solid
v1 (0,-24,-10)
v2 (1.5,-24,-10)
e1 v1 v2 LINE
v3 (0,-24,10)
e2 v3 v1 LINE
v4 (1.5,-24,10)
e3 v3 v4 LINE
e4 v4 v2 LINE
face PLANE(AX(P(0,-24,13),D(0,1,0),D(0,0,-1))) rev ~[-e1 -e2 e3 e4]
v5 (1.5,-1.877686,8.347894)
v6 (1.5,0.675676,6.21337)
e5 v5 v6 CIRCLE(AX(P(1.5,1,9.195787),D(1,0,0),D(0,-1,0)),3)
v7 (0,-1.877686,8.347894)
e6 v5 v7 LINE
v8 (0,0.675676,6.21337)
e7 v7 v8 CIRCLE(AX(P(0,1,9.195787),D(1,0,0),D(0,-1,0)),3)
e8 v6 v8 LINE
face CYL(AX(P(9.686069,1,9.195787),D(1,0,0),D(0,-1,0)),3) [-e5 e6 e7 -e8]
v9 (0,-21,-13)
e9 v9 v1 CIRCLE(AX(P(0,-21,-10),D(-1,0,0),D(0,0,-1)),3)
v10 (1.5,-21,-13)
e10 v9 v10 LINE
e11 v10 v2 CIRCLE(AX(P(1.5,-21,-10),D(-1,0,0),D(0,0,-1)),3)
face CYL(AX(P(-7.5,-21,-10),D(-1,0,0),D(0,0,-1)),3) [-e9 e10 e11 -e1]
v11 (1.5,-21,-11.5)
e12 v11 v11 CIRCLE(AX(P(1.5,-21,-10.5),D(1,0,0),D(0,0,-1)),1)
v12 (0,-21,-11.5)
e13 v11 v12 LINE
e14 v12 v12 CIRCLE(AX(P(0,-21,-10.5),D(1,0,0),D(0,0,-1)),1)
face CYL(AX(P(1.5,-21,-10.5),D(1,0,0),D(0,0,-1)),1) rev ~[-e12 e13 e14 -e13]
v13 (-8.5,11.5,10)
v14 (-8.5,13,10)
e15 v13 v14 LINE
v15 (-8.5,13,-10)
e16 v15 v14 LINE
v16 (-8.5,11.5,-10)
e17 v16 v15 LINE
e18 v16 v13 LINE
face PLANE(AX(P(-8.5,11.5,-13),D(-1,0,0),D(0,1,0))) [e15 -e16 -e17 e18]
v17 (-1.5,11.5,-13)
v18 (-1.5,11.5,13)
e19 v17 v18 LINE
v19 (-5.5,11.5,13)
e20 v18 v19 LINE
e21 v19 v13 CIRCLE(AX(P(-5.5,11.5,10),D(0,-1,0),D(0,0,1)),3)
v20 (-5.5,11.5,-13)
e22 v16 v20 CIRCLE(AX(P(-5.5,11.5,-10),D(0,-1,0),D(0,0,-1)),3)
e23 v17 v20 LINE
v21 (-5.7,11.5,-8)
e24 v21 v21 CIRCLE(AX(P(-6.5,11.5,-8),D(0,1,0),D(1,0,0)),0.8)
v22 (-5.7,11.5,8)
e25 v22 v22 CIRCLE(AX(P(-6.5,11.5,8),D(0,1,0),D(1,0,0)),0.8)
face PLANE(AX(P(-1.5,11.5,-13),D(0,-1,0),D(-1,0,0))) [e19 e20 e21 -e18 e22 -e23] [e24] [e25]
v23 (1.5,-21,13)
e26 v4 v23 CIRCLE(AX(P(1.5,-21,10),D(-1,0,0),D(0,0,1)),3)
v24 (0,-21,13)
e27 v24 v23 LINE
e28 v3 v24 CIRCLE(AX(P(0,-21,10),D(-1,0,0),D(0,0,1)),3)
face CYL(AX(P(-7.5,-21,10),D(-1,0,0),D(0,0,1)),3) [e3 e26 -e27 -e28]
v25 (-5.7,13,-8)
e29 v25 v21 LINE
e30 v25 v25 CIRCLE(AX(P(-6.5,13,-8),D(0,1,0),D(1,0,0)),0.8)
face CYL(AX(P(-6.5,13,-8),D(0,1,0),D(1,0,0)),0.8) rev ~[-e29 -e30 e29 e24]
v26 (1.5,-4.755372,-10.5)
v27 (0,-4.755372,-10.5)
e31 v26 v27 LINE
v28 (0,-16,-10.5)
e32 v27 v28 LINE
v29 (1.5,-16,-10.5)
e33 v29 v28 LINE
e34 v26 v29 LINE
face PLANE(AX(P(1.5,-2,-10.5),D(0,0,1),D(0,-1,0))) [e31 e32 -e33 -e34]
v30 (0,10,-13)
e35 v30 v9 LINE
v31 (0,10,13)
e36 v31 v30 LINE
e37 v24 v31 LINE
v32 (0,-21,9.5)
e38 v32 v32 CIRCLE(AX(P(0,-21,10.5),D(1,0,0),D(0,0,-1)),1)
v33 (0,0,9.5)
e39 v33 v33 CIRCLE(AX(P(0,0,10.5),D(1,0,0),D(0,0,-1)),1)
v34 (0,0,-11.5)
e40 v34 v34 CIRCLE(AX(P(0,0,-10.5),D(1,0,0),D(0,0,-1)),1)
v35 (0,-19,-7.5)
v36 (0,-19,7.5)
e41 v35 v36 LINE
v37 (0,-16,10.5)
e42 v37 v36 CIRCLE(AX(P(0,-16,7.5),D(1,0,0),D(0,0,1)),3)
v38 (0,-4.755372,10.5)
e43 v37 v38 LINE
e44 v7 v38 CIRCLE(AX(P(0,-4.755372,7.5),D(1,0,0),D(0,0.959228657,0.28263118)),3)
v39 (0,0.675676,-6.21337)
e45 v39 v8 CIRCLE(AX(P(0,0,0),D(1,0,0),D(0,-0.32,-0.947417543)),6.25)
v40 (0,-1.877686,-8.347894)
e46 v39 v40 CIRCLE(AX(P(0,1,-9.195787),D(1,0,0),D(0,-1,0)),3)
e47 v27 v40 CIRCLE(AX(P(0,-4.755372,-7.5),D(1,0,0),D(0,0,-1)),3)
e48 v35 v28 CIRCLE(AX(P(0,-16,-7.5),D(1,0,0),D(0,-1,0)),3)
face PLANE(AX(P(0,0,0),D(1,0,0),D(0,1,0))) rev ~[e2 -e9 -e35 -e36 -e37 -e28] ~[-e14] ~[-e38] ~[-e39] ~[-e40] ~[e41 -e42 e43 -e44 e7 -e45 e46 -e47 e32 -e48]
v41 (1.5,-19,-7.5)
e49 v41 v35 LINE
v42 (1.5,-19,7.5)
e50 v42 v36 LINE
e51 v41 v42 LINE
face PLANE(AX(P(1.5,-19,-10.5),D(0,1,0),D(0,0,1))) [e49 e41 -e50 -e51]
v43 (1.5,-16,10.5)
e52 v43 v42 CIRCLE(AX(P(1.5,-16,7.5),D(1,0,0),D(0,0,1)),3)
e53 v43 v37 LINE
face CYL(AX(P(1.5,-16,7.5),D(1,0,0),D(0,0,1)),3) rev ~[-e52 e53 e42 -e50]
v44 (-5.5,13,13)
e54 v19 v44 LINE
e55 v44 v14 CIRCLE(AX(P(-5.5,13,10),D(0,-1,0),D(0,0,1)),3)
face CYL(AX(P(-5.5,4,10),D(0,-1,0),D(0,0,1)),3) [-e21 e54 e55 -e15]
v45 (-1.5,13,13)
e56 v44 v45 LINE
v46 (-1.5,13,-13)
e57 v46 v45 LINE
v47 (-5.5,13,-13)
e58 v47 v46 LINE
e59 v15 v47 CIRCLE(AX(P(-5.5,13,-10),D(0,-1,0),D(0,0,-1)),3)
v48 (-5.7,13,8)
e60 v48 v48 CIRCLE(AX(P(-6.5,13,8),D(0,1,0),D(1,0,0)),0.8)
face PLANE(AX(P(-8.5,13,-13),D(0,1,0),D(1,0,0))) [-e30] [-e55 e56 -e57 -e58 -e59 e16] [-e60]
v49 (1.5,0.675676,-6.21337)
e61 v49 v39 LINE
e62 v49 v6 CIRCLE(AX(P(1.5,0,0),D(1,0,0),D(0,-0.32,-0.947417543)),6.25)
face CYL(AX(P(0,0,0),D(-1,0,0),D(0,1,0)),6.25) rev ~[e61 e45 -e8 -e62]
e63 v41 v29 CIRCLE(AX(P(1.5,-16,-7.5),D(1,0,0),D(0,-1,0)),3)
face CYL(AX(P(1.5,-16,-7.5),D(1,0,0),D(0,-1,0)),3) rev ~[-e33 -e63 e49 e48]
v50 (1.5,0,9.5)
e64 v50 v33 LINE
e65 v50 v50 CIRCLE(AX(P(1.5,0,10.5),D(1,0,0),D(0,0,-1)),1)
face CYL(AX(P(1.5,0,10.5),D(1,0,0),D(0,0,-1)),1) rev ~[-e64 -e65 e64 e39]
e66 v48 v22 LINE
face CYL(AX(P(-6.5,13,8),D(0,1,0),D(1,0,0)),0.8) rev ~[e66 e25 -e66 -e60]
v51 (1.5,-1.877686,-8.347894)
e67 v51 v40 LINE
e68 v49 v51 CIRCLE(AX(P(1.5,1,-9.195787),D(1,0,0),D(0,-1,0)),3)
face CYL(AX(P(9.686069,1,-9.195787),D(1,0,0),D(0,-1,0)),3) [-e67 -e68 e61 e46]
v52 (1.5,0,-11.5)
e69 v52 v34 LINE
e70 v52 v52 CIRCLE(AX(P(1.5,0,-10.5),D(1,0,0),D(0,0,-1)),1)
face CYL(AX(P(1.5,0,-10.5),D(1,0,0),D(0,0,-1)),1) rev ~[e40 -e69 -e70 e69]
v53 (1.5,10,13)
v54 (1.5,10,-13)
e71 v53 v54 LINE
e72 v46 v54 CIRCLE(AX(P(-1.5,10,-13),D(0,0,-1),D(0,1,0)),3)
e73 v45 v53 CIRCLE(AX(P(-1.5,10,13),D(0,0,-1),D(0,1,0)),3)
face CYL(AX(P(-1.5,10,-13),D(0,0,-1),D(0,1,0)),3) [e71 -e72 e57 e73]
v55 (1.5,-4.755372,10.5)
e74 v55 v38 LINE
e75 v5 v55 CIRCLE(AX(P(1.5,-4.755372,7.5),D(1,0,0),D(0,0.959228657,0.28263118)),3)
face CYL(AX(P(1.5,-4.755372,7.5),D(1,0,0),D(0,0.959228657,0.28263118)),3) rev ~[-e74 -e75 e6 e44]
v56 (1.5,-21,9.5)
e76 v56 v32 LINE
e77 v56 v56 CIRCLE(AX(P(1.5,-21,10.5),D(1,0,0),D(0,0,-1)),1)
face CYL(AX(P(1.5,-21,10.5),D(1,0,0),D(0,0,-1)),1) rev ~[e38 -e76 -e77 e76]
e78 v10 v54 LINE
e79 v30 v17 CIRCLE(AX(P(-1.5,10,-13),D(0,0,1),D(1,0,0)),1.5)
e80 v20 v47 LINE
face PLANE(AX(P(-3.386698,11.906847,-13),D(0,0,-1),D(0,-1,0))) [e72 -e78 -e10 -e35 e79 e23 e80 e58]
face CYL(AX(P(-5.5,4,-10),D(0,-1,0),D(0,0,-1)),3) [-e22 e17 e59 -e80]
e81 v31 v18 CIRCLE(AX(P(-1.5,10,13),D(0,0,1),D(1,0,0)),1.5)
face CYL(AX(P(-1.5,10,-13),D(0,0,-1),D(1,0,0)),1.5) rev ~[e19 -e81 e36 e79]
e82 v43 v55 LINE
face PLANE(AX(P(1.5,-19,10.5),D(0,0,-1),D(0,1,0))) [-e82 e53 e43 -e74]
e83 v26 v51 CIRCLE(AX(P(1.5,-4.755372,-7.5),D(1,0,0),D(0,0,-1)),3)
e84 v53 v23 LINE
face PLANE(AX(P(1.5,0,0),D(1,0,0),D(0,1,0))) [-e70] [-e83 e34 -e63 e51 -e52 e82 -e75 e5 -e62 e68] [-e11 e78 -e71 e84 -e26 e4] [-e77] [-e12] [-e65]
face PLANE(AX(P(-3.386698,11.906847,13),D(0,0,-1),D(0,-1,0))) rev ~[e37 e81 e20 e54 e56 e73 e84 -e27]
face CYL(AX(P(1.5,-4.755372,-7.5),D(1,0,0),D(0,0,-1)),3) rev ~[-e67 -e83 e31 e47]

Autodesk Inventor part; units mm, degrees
ref_plane "YZ Plane" through (0, 0, 0) normal (1, 0, 0) x (0, 1, 0)
ref_plane "XZ Plane" through (0, 0, 0) normal (0, 1, 0) x (-1, 0, 0)
ref_plane "XY Plane" through (0, 0, 0) normal (0, 0, 1) x (1, 0, 0)
sketch "スケッチ1" plane through (0, 0, 0) normal (1, 0, 0) x (0, 1, 0)
  circle A0 centre (0, 0) radius 6.25
  line L0 (0, 13) -> (-24, 13)
  line L1 (-24, 13) -> (-24, -13)
  line L2 (-24, -13) -> (0, -13)
  line L3 (0, -13) -> (0, 13) construction
  line L4 (0, 13) -> (13, 13)
  line L5 (13, 13) -> (13, -13)
  line L6 (13, -13) -> (0, -13)
  line L7 (0, -13) -> (0, 13)
  dimension "d0" = 12.5
  dimension "d1" = 24
  dimension "d2" = 26
  dimension "d3" = 13
extrude "プレート1" add sketch "スケッチ1" along normal blind 1.5 contours A0 L7 L4 L5 L6 | A0 L7 L2 L1 L0
sketch "スケッチ2" plane through (1.5, 11.5, -13) normal (0, 1, 0) x (-1, 0, 0)
  line L0 (0, 26) -> (0, 0)
  line L1 (0, 0) -> (10, 0)
  line L2 (10, 0) -> (10, 26)
  line L3 (10, 26) -> (0, 26)
edge flange "フランジ1" height 10 angle 90 thickness 1.5 bend radius 1.5 thickness toward (0, 1, 0) relief tear relief width 1.5 relief depth 0.75 edges at (0, 13, 0) wall of the first edge with corners at (1.5, 11.5, 13) (1.5, 11.5, -13) (-8.5, 11.5, -13) (-8.5, 11.5, 13)
bend "曲げ1"
corner "コーナー1"
sketch "スケッチ3" plane through (1.5, 0, 0) normal (1, 0, 0) x (0, 0, -1)
  circle A0 centre (10.5, 0) radius 1 projected
  circle A1 centre (-10.5, 0) radius 1 projected
  circle A2 centre (-10.5, -21) radius 1 projected
  circle A3 centre (10.5, -21) radius 1 projected
  point P0 (0, 0)
extrude "切り取り1" cut sketch "スケッチ3" against normal blind 1.5
sketch "スケッチ4" plane through (1.5, 0, 0) normal (1, 0, 0) x (0, 0, -1)
  circle A0 centre (-10.5, -21) radius 1 projected
  circle A1 centre (10.5, 0) radius 1 projected
  circle A2 centre (-10.5, 0) radius 1 projected
  circle A3 centre (10.5, -21) radius 1 projected
  line L0 (13, 10) -> (-13, 10) projected
  line L1 (-13, -24) -> (-13, 10) projected
  line L2 (13, -24) -> (-13, -24) projected
  line L3 (13, 10) -> (13, -24) projected
  circle A4 centre (0, 0) radius 6.25 projected
  line L4 (-10.5, 0) -> (10.5, 0)
  line L5 (10.5, 0) -> (10.5, -21)
  line L6 (10.5, -21) -> (-10.5, -21)
  line L7 (-10.5, -21) -> (-10.5, 0)
  line L8 (-10.5, -2) -> (10.5, -2)
  line L9 (10.5, -2) -> (10.5, -19)
  line L10 (10.5, -19) -> (-10.5, -19)
  line L11 (-10.5, -19) -> (-10.5, -2)
  dimension "d17" = 2
  dimension "d18" = 2
extrude "切り取り2" cut sketch "スケッチ4" against normal blind 1.5 contours L7 L8 A4 L5 L10 | L8 A4
sketch "スケッチ5" plane through (-8.5, 13, 13) normal (0, 1, 0) x (1, 0, 0)
  circle A0 centre (2, 21) radius 0.8
  circle A1 centre (2, 5) radius 0.8
  line L0 (0, 0) -> (0, 26) projected
  line L1 (0, 26) -> (7, 26) projected
  line L2 (7, 0) -> (0, 0) projected
  point P0 (8.5, 13)
  dimension "d21" = 1.6
  dimension "d23" = 2
  dimension "d24" = 5
  dimension "d25" = 5
extrude "切り取り3" cut sketch "スケッチ5" against normal blind 1.5
fillet "フィレット1" radius 3 10 edges at (-8.5, 12.25, -13) (-8.5, 12.25, 13) (0.75, -2, 5.9214) (0.75, -2, -5.9214) (0.75, -2, -10.5) (0.75, -2, 10.5) (0.75, -24, -13) (0.75, -24, 13) (0.75, -19, -10.5) (0.75, -19, 10.5)
equation "\"d15\" = Thickness"
equation "\"d18\" = d17"
equation "\"d19\" = Thickness"
equation "\"d25\" = d24"
equation "\"d26\" = Thickness"
equation "\"d4\" = Thickness"
equation "\"d5\" = BendReliefWidth"
equation "\"d6\" = BendReliefDepth"
equation "\"d7\" = MinimumRemnant"
equation "\"d8\" = TransitionRadius"
equation "\"d11\" = BendRadius"
equation "\"d12\" = CornerReliefSize"
equation "\"d13\" = GapSize"
equation "\"d14\" = JacobiRadiusSize"
equation "\"BendRadius\" = Thickness"
equation "\"BendReliefWidth\" = Thickness"
equation "\"BendReliefDepth\" = 0.5 * Thickness"
equation "\"CornerReliefSize\" = 4 * Thickness"
equation "\"MinimumRemnant\" = 2 * Thickness"
equation "\"TransitionRadius\" = BendRadius"
equation "\"JacobiRadiusSize\" = BendRadius"
equation "\"GapSize\" = Thickness"
equation "\"Thickness\" = 1.5"
properties part number "neck_joint"
